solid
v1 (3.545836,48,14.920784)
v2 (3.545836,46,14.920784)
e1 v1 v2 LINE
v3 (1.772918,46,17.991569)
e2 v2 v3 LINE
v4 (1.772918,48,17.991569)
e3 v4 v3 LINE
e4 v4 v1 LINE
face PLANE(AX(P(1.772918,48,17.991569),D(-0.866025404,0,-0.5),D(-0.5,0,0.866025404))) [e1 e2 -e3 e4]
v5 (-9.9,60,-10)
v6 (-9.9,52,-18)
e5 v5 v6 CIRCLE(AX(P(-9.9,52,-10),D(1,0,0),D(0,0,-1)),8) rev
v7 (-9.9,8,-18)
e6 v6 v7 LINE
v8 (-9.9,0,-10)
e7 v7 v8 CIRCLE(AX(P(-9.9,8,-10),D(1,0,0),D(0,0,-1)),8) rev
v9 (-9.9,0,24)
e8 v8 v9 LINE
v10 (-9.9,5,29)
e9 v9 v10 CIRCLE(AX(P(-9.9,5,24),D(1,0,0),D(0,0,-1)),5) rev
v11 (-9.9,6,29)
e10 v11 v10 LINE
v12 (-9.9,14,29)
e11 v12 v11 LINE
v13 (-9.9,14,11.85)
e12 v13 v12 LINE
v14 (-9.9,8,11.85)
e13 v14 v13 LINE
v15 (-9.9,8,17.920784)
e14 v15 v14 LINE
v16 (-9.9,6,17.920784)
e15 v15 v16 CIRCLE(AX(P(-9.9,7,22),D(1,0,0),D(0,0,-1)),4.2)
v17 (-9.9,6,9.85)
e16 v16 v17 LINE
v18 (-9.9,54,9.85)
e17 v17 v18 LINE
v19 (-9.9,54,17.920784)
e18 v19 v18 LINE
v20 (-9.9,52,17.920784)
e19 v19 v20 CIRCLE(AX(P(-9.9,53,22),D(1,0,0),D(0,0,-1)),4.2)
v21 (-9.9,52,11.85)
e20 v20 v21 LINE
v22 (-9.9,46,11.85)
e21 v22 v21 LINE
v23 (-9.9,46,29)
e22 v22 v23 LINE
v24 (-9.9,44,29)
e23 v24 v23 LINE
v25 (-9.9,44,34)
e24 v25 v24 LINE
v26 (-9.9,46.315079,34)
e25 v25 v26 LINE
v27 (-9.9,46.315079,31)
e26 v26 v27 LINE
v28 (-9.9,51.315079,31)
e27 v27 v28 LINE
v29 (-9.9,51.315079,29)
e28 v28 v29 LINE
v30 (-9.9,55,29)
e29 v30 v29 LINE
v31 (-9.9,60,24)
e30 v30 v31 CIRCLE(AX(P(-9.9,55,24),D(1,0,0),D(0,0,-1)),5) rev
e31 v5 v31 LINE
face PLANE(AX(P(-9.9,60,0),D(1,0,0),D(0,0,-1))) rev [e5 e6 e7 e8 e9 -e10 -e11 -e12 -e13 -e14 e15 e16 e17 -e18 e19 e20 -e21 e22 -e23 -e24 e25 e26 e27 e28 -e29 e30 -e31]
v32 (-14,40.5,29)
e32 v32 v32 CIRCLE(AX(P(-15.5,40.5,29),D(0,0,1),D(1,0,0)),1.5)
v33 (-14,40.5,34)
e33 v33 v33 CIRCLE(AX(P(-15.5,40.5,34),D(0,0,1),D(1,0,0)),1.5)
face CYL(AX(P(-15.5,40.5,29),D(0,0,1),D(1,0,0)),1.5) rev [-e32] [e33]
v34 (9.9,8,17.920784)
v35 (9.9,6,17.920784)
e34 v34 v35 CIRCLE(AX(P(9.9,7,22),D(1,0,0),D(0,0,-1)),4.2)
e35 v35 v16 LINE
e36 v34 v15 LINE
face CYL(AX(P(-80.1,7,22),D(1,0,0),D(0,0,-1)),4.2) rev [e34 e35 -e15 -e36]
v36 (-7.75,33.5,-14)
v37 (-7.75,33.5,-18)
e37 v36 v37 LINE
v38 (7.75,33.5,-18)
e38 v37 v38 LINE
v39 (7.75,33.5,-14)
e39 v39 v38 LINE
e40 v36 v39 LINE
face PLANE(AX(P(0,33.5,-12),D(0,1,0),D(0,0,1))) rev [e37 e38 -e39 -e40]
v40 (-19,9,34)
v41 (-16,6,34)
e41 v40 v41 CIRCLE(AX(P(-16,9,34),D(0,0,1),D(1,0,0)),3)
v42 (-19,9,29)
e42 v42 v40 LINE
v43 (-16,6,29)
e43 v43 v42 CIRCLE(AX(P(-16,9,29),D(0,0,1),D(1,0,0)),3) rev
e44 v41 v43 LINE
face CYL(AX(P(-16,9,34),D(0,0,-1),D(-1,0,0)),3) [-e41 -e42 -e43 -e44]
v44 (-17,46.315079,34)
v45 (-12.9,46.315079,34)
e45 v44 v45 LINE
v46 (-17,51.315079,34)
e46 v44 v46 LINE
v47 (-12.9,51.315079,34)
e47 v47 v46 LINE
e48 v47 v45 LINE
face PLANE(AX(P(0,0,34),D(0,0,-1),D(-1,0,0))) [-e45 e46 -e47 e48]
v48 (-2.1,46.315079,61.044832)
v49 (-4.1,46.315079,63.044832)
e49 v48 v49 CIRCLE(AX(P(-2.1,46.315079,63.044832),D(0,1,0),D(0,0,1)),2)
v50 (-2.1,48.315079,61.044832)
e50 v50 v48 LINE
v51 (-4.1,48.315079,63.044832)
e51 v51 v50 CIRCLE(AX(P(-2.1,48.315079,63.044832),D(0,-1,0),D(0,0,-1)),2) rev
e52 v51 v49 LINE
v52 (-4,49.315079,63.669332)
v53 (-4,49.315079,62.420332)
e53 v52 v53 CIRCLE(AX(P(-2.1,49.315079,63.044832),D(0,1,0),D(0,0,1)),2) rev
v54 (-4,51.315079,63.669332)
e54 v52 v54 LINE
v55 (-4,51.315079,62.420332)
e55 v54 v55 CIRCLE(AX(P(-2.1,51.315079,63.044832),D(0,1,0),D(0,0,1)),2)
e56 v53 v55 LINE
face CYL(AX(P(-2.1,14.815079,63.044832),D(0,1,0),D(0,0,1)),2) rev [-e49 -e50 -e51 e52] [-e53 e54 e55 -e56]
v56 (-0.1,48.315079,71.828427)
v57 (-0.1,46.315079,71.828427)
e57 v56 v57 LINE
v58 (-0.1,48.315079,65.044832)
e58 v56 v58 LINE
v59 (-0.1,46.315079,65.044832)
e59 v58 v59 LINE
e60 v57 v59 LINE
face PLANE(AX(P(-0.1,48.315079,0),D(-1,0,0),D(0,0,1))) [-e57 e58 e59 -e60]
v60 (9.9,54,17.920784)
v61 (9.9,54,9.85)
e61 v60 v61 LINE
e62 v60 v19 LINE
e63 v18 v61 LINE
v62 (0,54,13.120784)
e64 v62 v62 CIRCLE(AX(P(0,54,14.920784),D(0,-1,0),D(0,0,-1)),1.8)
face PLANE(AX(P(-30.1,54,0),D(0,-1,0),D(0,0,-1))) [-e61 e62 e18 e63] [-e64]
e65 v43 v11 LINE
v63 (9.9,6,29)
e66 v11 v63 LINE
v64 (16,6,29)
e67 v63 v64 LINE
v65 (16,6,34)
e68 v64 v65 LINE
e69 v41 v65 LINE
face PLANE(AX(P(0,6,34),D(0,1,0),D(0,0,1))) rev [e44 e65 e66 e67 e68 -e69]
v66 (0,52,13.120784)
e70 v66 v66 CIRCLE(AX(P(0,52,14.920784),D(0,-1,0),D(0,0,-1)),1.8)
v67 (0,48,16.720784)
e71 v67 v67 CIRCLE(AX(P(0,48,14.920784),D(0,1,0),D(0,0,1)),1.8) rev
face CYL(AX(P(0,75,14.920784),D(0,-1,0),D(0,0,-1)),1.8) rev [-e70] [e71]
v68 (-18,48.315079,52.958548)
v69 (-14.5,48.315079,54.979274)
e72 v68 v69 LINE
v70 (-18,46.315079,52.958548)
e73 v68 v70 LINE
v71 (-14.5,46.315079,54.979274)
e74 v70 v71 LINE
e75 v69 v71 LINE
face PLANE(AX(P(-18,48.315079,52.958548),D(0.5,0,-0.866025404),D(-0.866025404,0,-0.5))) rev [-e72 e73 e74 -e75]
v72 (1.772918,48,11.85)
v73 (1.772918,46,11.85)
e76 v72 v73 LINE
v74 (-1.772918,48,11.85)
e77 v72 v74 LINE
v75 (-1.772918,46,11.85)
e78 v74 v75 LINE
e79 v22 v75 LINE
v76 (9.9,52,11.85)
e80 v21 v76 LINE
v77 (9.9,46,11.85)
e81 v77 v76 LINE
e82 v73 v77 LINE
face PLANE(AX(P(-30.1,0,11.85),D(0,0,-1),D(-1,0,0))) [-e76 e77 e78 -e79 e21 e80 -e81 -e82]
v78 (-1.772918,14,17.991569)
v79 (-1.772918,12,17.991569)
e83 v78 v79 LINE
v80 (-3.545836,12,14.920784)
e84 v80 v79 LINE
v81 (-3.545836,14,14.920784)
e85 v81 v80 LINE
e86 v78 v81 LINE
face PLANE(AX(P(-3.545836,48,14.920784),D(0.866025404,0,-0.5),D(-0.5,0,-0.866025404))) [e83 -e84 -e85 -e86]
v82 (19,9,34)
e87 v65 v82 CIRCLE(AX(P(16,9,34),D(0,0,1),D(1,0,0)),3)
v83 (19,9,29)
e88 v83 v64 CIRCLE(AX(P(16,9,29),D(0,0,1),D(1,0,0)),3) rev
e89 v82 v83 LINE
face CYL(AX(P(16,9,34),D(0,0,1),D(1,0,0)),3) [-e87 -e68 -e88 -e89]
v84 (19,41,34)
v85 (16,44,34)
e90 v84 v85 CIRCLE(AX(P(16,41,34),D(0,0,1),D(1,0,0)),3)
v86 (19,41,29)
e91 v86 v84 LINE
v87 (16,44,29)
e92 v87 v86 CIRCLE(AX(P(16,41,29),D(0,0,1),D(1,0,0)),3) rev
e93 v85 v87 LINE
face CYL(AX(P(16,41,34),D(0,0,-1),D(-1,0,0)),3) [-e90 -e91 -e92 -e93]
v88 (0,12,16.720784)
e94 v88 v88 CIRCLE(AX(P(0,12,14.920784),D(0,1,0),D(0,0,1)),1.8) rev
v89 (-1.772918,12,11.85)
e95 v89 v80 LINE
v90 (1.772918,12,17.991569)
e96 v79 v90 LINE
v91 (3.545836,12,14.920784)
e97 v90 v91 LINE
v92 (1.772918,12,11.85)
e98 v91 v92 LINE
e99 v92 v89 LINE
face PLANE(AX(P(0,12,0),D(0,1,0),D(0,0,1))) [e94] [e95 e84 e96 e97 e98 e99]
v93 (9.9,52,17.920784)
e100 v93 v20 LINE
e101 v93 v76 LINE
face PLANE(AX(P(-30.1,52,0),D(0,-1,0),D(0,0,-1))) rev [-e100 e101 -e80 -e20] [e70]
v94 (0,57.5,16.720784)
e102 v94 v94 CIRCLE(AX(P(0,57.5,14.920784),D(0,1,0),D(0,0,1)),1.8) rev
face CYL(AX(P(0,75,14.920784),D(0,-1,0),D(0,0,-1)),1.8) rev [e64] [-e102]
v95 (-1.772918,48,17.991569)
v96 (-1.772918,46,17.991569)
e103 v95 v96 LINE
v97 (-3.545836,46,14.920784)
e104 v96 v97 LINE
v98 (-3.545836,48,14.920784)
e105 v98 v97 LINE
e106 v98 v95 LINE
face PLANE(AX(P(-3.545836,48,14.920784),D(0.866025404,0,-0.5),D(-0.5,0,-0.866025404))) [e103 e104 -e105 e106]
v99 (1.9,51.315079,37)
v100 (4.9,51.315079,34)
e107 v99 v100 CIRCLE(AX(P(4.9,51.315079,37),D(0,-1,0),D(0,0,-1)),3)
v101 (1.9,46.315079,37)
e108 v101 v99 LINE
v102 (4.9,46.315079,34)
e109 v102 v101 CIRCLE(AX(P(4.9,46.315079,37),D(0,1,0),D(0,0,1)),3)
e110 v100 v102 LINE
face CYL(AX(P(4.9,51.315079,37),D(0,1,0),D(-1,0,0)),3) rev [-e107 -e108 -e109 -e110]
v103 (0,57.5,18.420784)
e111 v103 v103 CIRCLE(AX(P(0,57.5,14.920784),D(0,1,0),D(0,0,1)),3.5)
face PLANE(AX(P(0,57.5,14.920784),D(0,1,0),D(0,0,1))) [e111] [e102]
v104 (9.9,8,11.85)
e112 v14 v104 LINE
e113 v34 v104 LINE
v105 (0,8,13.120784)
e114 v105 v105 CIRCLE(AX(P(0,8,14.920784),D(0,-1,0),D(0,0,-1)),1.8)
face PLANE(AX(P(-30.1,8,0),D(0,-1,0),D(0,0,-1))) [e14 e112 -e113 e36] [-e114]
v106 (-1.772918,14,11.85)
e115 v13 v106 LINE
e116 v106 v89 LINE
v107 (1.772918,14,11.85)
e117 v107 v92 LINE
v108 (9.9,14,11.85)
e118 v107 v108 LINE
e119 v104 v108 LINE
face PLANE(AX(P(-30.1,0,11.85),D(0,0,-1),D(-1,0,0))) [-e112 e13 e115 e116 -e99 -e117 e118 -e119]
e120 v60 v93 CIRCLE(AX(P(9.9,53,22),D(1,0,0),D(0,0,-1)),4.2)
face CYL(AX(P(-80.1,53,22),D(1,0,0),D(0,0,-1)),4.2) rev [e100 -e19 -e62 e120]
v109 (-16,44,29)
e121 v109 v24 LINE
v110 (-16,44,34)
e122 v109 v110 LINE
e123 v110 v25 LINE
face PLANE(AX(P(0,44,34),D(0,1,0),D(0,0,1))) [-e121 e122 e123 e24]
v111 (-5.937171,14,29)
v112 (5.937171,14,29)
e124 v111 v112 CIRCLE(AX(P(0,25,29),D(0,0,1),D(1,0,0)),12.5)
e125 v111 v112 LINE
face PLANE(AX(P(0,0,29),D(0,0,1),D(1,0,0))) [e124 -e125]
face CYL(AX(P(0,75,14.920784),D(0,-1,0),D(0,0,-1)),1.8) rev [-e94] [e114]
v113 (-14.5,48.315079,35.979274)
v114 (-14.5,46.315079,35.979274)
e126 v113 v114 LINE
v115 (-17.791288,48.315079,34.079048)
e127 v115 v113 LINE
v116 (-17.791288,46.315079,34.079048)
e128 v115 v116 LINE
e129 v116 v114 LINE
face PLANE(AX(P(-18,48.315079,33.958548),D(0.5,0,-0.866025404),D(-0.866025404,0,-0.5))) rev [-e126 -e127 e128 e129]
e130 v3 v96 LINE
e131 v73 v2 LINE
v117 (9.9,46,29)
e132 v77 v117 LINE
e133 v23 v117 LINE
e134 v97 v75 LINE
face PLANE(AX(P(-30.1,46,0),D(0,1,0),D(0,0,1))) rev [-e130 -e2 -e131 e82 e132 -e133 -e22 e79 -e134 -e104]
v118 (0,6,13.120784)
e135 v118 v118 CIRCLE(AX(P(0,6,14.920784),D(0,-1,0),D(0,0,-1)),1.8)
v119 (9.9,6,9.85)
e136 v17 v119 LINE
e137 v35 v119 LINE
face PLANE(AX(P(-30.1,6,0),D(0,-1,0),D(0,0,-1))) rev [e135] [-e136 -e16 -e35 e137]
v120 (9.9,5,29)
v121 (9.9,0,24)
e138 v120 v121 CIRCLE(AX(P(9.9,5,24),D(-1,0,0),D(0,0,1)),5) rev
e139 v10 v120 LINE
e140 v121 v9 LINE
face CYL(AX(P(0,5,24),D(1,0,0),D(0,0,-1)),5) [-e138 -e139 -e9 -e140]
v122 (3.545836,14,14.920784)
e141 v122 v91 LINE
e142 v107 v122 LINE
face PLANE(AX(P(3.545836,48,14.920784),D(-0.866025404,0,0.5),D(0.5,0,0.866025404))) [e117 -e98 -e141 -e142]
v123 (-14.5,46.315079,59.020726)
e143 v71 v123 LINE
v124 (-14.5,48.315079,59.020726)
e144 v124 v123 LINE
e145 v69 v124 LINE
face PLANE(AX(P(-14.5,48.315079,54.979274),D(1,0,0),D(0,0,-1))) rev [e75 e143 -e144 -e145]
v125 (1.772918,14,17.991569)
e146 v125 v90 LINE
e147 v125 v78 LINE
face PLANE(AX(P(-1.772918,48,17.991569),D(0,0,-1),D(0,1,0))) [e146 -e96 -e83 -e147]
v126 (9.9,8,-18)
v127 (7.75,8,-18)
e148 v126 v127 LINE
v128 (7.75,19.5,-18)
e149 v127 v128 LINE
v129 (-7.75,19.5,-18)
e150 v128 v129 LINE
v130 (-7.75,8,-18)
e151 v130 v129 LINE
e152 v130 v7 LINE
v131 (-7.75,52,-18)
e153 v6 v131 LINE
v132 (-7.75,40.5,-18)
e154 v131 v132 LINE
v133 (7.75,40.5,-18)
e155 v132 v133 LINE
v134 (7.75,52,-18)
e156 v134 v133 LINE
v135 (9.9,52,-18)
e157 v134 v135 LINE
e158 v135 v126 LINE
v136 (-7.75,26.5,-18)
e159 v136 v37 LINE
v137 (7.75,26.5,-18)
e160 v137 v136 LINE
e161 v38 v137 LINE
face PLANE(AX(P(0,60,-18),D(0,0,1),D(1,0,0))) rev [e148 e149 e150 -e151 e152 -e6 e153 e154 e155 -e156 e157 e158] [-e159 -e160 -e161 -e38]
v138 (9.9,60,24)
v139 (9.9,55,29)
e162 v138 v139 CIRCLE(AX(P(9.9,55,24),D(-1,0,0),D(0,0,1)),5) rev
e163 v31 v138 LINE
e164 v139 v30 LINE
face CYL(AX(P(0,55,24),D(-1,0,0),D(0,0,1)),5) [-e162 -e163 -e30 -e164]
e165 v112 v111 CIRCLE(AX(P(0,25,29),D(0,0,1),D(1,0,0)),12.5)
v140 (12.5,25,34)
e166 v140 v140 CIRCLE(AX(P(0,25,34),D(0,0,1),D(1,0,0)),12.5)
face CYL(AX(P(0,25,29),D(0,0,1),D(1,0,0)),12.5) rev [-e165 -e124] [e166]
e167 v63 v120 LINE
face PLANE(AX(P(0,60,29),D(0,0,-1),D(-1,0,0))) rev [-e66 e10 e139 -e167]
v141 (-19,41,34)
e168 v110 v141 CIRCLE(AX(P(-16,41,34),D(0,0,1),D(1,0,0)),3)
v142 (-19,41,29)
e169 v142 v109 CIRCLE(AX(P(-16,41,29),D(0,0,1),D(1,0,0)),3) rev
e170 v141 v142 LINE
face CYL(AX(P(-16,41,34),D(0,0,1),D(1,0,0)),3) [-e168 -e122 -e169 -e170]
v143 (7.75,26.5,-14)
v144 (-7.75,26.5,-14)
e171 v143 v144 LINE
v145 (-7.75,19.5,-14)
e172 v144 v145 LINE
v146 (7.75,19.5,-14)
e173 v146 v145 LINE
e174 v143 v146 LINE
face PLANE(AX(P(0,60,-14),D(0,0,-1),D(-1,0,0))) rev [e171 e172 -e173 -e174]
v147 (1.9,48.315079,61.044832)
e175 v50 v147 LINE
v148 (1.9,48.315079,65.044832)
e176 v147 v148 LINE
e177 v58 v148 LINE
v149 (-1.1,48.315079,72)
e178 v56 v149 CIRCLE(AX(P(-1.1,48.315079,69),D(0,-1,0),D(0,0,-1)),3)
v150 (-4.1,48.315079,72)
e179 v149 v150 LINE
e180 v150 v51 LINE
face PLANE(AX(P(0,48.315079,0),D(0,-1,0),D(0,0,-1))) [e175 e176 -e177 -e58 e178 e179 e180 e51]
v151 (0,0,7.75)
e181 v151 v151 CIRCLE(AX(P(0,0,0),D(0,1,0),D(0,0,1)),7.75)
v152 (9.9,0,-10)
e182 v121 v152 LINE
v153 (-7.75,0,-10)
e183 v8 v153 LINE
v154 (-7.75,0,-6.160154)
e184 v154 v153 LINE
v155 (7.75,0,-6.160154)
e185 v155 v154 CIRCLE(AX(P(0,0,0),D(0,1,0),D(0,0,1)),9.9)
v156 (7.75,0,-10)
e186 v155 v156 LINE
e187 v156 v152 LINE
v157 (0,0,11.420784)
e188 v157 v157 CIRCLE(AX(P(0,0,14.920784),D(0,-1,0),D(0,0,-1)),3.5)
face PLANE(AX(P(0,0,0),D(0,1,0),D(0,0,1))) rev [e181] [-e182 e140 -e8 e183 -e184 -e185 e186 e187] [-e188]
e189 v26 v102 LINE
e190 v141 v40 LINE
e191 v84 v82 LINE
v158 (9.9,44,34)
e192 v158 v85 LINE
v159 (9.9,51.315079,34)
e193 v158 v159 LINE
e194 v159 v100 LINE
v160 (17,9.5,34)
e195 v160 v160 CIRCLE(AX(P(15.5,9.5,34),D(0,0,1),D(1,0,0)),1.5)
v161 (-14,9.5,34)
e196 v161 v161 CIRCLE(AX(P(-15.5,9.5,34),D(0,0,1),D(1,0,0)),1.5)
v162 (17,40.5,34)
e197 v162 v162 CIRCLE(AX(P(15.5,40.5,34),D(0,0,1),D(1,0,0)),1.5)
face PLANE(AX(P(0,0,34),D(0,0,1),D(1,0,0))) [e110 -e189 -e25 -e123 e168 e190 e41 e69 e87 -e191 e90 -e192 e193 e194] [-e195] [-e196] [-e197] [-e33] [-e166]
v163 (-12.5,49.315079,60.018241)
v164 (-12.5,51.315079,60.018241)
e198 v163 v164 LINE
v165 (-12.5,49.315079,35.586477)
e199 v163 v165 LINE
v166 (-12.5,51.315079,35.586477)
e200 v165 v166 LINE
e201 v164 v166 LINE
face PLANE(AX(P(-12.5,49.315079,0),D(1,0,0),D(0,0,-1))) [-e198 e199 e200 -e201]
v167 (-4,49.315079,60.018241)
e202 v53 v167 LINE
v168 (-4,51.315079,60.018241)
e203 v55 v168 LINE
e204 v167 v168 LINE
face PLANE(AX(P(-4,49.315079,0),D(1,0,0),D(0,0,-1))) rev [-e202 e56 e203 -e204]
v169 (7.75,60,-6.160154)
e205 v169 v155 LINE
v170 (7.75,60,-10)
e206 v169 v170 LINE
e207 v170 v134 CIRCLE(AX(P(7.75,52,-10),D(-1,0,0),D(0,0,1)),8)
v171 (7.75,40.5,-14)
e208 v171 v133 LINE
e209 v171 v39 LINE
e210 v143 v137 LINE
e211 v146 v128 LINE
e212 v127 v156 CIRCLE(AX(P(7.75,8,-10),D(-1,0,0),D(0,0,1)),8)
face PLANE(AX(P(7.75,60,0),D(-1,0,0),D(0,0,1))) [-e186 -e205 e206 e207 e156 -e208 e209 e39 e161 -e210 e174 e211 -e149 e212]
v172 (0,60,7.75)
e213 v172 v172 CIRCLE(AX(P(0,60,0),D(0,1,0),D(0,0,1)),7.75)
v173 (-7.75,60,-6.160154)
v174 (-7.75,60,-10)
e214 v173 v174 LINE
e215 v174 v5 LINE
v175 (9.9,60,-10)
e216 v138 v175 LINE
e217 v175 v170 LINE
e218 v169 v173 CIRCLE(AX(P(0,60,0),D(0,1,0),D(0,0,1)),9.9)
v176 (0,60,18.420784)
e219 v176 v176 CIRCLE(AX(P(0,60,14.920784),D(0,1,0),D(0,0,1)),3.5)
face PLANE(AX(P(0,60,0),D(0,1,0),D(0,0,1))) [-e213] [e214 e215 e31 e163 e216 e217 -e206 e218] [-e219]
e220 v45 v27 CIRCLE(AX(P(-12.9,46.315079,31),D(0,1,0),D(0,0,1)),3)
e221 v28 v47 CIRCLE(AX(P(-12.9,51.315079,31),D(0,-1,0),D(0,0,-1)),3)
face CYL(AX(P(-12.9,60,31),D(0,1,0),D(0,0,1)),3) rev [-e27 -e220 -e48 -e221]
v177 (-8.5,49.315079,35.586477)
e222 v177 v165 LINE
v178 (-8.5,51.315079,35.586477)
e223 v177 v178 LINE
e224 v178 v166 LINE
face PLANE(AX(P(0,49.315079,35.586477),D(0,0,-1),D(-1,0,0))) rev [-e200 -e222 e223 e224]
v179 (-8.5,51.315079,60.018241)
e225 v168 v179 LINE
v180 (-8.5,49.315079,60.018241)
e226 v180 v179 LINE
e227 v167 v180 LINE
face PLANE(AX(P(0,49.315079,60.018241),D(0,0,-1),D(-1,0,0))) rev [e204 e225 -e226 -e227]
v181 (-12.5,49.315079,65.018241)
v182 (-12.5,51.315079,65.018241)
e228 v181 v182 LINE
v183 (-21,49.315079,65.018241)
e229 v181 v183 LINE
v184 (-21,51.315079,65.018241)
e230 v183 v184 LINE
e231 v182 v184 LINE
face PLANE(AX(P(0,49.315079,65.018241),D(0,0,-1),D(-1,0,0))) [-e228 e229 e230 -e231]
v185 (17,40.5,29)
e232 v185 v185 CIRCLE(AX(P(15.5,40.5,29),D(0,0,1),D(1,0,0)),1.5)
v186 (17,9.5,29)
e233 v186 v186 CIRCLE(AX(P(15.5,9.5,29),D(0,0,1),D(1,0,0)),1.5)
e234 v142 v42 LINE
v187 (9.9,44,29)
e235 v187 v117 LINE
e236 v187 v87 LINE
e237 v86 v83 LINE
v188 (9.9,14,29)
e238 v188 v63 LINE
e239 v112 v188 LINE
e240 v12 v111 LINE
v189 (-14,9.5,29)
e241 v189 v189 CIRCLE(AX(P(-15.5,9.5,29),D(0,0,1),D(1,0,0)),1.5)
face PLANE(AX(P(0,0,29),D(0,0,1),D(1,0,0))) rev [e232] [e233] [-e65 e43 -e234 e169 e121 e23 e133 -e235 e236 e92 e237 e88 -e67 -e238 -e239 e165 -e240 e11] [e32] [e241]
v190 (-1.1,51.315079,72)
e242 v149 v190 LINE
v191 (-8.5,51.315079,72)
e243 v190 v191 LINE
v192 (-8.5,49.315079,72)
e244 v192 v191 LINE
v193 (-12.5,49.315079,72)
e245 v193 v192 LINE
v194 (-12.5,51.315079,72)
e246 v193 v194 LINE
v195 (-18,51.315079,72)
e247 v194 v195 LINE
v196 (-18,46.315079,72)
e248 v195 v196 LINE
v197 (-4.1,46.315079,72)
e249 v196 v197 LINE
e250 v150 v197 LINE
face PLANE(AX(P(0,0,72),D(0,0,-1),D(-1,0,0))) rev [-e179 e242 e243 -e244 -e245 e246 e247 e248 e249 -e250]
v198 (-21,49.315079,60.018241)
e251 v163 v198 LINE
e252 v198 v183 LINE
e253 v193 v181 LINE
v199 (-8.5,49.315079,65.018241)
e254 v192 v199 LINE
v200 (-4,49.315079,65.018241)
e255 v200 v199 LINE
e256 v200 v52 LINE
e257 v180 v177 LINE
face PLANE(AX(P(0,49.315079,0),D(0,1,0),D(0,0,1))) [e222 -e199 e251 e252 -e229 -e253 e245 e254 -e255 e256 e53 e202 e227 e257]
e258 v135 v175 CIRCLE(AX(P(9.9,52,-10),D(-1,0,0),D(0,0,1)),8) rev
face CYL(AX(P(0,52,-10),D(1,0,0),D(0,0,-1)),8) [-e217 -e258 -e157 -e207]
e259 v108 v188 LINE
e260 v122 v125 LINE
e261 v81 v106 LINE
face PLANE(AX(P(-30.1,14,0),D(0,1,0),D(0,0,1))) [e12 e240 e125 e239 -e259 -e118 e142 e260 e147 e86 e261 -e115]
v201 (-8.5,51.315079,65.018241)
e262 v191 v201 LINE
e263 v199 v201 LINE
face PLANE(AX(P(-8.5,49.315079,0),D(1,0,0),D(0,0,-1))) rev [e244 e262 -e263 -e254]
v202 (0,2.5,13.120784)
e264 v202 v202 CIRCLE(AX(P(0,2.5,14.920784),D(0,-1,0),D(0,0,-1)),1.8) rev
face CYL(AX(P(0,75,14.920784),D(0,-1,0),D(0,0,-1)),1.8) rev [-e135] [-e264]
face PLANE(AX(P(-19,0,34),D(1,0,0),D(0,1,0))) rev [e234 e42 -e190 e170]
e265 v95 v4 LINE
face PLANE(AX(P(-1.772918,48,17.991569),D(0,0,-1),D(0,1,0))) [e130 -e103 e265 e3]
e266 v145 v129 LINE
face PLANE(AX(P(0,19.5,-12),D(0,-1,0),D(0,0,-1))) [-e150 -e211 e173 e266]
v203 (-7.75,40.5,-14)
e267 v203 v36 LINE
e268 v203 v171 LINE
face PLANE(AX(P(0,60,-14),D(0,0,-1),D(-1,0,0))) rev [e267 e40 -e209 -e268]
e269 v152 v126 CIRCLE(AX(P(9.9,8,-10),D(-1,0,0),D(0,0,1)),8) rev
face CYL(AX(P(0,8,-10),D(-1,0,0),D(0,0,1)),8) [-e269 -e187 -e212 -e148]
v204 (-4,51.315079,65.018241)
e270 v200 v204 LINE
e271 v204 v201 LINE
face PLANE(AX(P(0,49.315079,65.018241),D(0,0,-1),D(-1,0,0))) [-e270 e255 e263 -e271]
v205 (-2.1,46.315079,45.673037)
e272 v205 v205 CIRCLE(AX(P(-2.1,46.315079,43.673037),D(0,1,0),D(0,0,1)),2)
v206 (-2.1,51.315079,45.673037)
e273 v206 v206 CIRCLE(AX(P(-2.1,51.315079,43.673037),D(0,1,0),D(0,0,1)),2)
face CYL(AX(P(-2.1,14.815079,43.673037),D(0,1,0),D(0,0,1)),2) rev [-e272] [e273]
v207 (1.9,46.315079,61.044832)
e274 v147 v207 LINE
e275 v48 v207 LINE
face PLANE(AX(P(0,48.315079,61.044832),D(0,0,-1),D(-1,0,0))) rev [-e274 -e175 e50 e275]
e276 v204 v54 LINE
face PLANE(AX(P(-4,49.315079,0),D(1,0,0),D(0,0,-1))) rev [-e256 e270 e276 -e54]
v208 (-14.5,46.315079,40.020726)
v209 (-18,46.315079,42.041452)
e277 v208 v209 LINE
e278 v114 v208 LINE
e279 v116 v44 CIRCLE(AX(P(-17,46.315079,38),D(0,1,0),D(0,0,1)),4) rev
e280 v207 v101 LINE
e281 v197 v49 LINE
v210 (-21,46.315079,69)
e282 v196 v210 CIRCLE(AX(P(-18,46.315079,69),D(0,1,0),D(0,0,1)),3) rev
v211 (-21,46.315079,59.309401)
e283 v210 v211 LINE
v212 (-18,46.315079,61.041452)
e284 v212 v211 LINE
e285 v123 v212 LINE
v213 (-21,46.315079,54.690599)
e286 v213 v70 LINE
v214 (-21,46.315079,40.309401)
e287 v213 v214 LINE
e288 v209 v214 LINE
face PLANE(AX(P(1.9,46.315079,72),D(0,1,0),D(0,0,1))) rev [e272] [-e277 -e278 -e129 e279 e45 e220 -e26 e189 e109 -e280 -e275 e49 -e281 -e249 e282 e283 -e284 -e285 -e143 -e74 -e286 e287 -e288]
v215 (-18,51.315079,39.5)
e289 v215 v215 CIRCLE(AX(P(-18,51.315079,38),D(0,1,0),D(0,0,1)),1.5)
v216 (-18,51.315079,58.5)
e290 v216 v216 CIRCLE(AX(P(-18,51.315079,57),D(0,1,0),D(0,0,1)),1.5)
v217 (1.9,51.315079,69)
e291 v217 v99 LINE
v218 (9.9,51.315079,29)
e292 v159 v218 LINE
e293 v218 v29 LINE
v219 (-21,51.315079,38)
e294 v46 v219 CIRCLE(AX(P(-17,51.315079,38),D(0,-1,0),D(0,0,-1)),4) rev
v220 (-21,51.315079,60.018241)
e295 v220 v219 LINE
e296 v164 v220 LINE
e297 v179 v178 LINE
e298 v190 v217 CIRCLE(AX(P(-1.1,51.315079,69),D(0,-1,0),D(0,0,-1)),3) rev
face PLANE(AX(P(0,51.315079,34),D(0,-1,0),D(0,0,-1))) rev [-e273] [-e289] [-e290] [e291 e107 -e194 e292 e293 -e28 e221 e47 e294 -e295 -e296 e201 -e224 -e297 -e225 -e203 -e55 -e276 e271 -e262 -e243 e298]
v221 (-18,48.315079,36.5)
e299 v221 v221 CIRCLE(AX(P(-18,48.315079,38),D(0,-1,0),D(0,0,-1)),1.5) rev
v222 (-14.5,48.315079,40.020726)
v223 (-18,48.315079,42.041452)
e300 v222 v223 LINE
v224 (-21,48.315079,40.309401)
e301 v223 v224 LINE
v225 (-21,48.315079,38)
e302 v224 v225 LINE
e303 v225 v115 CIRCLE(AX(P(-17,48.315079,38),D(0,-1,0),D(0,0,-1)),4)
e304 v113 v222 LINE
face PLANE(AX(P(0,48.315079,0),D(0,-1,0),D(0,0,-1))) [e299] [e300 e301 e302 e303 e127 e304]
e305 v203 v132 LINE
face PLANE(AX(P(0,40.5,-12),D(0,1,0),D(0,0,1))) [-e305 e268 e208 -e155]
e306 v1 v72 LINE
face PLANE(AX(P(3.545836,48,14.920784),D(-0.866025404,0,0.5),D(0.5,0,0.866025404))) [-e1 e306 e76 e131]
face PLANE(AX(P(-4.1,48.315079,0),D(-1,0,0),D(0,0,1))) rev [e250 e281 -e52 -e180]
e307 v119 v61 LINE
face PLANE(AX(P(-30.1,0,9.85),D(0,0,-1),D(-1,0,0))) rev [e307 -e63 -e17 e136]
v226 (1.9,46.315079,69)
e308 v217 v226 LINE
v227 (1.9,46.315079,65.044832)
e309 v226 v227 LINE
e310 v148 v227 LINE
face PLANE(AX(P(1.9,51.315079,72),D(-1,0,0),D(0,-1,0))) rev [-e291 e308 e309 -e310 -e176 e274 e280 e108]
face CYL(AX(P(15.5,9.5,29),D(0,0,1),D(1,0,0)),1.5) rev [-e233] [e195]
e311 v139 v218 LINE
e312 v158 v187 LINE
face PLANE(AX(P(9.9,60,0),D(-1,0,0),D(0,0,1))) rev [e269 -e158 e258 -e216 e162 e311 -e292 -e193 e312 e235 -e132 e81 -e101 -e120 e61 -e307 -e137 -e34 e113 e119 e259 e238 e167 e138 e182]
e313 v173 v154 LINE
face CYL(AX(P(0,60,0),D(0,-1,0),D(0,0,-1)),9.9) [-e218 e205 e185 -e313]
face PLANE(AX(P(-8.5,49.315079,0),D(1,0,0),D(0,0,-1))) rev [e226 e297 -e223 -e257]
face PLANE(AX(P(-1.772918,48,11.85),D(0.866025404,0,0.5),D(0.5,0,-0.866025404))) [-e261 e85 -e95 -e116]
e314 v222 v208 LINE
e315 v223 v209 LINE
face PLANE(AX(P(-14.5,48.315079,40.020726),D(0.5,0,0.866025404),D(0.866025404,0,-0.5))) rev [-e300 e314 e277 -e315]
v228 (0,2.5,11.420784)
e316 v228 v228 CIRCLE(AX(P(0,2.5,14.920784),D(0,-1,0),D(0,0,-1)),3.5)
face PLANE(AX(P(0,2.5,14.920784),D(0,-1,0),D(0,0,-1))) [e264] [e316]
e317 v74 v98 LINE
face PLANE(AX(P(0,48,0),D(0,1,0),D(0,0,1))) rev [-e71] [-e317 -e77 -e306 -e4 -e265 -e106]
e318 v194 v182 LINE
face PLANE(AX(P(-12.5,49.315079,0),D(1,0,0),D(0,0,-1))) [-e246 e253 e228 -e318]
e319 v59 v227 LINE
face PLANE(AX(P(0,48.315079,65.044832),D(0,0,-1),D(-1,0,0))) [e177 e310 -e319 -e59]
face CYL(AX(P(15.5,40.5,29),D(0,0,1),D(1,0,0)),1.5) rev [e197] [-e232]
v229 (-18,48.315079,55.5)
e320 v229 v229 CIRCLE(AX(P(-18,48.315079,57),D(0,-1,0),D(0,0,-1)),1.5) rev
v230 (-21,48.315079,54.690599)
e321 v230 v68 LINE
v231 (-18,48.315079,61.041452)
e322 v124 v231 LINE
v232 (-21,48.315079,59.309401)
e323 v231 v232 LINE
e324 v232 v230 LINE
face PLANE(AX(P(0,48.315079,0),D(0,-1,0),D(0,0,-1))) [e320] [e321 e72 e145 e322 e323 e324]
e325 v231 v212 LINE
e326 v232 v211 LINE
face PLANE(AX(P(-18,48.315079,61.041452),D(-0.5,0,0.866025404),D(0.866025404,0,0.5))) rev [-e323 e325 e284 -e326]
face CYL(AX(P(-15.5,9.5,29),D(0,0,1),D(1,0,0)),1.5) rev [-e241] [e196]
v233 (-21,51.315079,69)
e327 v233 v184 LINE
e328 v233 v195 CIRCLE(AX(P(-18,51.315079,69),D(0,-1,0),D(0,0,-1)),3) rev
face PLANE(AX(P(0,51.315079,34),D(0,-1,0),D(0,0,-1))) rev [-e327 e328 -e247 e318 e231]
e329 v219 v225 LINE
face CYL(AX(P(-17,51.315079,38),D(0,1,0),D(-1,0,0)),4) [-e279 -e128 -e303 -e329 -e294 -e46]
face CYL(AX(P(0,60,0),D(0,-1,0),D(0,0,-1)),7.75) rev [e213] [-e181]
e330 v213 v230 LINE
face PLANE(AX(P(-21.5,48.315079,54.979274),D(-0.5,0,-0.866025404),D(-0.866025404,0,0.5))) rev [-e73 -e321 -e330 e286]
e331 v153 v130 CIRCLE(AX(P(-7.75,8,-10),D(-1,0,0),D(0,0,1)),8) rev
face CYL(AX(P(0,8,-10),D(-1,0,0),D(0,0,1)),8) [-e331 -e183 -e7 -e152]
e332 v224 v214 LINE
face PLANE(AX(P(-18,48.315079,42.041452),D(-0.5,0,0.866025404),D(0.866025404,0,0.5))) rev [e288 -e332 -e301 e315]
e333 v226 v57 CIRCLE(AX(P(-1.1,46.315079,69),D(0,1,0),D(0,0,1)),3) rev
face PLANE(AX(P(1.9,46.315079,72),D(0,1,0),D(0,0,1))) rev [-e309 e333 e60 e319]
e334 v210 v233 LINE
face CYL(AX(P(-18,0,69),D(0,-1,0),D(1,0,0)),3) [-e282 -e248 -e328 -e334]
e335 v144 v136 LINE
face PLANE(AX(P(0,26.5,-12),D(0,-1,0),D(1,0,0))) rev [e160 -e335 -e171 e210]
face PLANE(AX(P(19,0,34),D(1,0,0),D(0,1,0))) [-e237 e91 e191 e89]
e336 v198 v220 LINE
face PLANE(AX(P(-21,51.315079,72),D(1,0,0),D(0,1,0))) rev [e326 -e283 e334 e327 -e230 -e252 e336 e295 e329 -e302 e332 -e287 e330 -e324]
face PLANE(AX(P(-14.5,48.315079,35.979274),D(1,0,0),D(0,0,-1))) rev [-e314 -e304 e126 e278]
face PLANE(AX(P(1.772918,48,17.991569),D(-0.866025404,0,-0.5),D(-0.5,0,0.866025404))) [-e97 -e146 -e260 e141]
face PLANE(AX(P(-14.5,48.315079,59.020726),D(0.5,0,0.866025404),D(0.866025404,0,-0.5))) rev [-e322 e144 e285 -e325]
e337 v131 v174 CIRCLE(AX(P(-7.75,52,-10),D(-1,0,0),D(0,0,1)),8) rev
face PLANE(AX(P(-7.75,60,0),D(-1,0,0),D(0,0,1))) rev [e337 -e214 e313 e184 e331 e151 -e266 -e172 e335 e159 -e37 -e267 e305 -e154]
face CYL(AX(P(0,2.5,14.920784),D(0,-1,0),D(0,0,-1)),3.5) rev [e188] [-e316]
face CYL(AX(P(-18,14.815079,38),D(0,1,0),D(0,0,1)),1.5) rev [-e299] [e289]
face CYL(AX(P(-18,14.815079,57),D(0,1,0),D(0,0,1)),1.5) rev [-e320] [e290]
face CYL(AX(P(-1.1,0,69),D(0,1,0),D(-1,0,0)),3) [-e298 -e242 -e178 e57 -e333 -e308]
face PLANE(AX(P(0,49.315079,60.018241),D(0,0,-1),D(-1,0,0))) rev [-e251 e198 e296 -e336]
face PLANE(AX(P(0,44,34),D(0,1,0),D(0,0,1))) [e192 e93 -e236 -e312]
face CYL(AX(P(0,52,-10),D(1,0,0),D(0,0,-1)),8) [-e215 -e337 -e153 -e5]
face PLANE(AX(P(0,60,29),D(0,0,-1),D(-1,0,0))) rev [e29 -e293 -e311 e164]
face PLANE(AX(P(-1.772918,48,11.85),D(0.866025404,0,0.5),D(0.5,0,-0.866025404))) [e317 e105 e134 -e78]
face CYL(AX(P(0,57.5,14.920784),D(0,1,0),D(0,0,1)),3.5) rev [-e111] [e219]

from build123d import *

# Parameters (mm, degrees)
SKETCH_1_W                = 15.5
SKETCH_1_H                = 11.302783866
EXTRUDE_1_DEPTH           = 60
SKETCH_2_R                = 4.2
CUT_EXTRUDE_1_DEPTH       = 90
CUT_EXTRUDE_2_DEPTH       = 40
SKETCH_4_W                = 15.5
SKETCH_4_H                = 19.5
SKETCH_4_H_2              = 7
CUT_EXTRUDE_3_DEPTH       = 6
FILLET_1_R                = 5
FILLET_2_R                = 8
SKETCH_13_R               = 1.8
CUT_EXTRUDE_9_DEPTH       = 75
SKETCH_8_W                = 19.8
SKETCH_8_H                = 7.315078523
SKETCH_8_H_2              = 8
EXTRUDE_3_DEPTH           = 5
SKETCH_10_R               = 12.5
SKETCH_10_R_2             = 1.5
CUT_EXTRUDE_6_DEPTH       = 5
FILLET_4_R                = 3
CUT_EXTRUDE_10_DEPTH      = 34
CUT_EXTRUDE_10_DEPTH_BACK = 2
SKETCH_15_R               = 3.5
CUT_EXTRUDE_11_DEPTH      = 2.5
CUT_EXTRUDE_START         = -2.5
SKETCH_16_R               = 3.5
CUT_EXTRUDE_12_DEPTH      = 2.5
SKETCH_17_W               = 22.9
SKETCH_17_H               = 5
EXTRUDE_4_DEPTH           = 38
SKETCH_18_R               = 1.5
SKETCH_18_R_2             = 2
CUT_EXTRUDE_13_DEPTH      = 36.5
CUT_EXTRUDE_14_DEPTH      = 2
FILLET_5_R                = 3
SKETCH_20_W               = 4.5
SKETCH_20_H               = 5
SKETCH_20_W_2             = 4
SKETCH_20_W_3             = 8.5
SKETCH_20_H_2             = 6.981759249
SKETCH_20_H_3             = 24.431763341
CUT_EXTRUDE_15_DEPTH      = 2
FILLET_6_R                = 4
SKETCH_22_W               = 4
SKETCH_22_H               = 4
SKETCH_22_H_2             = 8.955168194
CUT_EXTRUDE_16_DEPTH      = 2


with BuildPart() as part:
    # Эскиз1 → Бобышка-Вытянуть1 (new body)
    with BuildSketch(Plane(origin=(0, 0, 0), x_dir=(1, 0, 0), z_dir=(0, 1, 0))):
        with BuildLine():
            Line((7.75, 0), (7.75, 6.160154219))
            ThreePointArc((7.75, 6.160154219), (0, 9.9), (-7.75, 6.160154219))
            Line((-7.75, 6.160154219), (-7.75, -3.2e-08))
            ThreePointArc((-7.75, -3.2e-08), (-1.6e-08, 7.75), (7.75, 0))
        make_face()
        with BuildLine():
            ThreePointArc((0, -9.9), (4.302584876, -8.916151826), (7.75, -6.160154219))
            Line((7.75, -6.160154219), (7.75, 0))
            ThreePointArc((7.75, 0), (1.6e-08, -7.75), (-7.75, -3.2e-08))
            Line((-7.75, -3.2e-08), (-7.75, -6.160154219))
            ThreePointArc((-7.75, -6.160154219), (-4.302584876, -8.916151826), (0, -9.9))
        make_face()
        with BuildLine():
            ThreePointArc((7.75, 6.160154219), (9.347058361, 3.262284476), (9.9, 0))
            Line((9.9, 0), (9.9, 18))
            Line((9.9, 18), (-9.9, 18))
            Line((-9.9, 18), (-9.9, 0))
            ThreePointArc((-9.9, 0), (-9.347058361, 3.262284476), (-7.75, 6.160154219))
            Line((-7.75, 6.160154219), (-7.75, 14))
            Line((-7.75, 14), (7.75, 14))
            Line((7.75, 14), (7.75, 6.160154219))
        make_face()
        with BuildLine():
            ThreePointArc((7.75, -6.160154219), (9.347058361, -3.262284476), (9.9, 0))
            ThreePointArc((9.9, 0), (9.347058361, 3.262284476), (7.75, 6.160154219))
            Line((7.75, 6.160154219), (7.75, 0))
            Line((7.75, 0), (7.75, -6.160154219))
        make_face()
        with BuildLine():
            Line((-7.75, -3.2e-08), (-7.75, 6.160154219))
            ThreePointArc((-7.75, 6.160154219), (-9.347058361, 3.262284476), (-9.9, 0))
            ThreePointArc((-9.9, 0), (-9.347058361, -3.262284476), (-7.75, -6.160154219))
            Line((-7.75, -6.160154219), (-7.75, -3.2e-08))
        make_face()
        with BuildLine():
            Line((9.9, -29), (9.9, 0))
            ThreePointArc((9.9, 0), (9.347058361, -3.262284476), (7.75, -6.160154219))
            Line((7.75, -6.160154219), (7.75, -9.9))
            Line((7.75, -9.9), (7.75, -11.85))
            Line((7.75, -11.85), (7.75, -23.152783866))
            Line((7.75, -23.152783866), (-7.75, -23.152783866))
            Line((-7.75, -23.152783866), (-7.75, -11.85))
            Line((-7.75, -11.85), (-7.75, -9.9))
            Line((-7.75, -9.9), (-7.75, -6.160154219))
            ThreePointArc((-7.75, -6.160154219), (-9.347058361, -3.262284476), (-9.9, 0))
            Line((-9.9, 0), (-9.9, -29))
            Line((-9.9, -29), (9.9, -29))
        make_face()
        with Locations((0, -17.501391933)):
            Rectangle(SKETCH_1_W, SKETCH_1_H)
        Polygon((7.75, -11.85), (7.75, -9.9), (0, -9.9), (-7.75, -9.9), (-7.75, -11.85), align=None)
        with BuildLine():
            Line((7.75, -9.9), (7.75, -6.160154219))
            ThreePointArc((7.75, -6.160154219), (4.302584876, -8.916151826), (0, -9.9))
            Line((0, -9.9), (7.75, -9.9))
        make_face()
        with BuildLine():
            Line((-7.75, -9.9), (0, -9.9))
            ThreePointArc((0, -9.9), (-4.302584876, -8.916151826), (-7.75, -6.160154219))
            Line((-7.75, -6.160154219), (-7.75, -9.9))
        make_face()
    extrude(amount=EXTRUDE_1_DEPTH)

    # Эскиз2 → Вырез-Вытянуть1 (cut)
    with BuildSketch(Plane(origin=(9.9, 0, 0), x_dir=(0, 0, -1), z_dir=(1, 0, 0))):
        with Locations((-22, 53)):
            Circle(SKETCH_2_R)
        with Locations((-22, 7)):
            Circle(SKETCH_2_R)
    extrude(amount=-CUT_EXTRUDE_1_DEPTH, mode=Mode.SUBTRACT)

    # Эскиз3 → Вырез-Вытянуть2 (cut)
    with BuildSketch(Plane(origin=(9.9, 0, 0), x_dir=(0, 0, -1), z_dir=(1, 0, 0))):
        Polygon((-29, 46), (-29, 14), (-11.85, 14), (-11.85, 8), (-22, 8), (-22, 6), (-9.85, 6), (-9.85, 54), (-22, 54), (-22, 52), (-11.85, 52), (-11.85, 46), align=None)
    extrude(amount=-CUT_EXTRUDE_2_DEPTH, mode=Mode.SUBTRACT)

    # Эскиз4 → Вырез-Вытянуть3 (cut)
    with BuildSketch(Plane(origin=(0, 0, -18), x_dir=(-1, 0, 0), z_dir=(0, 0, -1))):
        with Locations((0, 50.25)):
            Rectangle(SKETCH_4_W, SKETCH_4_H)
        with Locations((0, 30)):
            Rectangle(SKETCH_4_W, SKETCH_4_H_2)
        with Locations((0, 9.75)):
            Rectangle(SKETCH_4_W, SKETCH_4_H)
    extrude(amount=-CUT_EXTRUDE_3_DEPTH, mode=Mode.SUBTRACT)

    # Скругление1
    fillet_1_edges = [part.edges().sort_by_distance(p)[0] for p in [
        (0, 60, 29),
        (0, 0, 29),
    ]]
    fillet(fillet_1_edges, radius=FILLET_1_R)

    # Скругление2
    fillet_2_edges = [part.edges().sort_by_distance(p)[0] for p in [
        (-8.825, 60, -18),
        (-8.825, 0, -18),
        (8.825, 0, -18),
        (8.825, 60, -18),
    ]]
    fillet(fillet_2_edges, radius=FILLET_2_R)

    # Эскиз13 → Вырез-Вытянуть9 (cut)
    with BuildSketch(Plane.XZ):
        with Locations(Location((0, 14.920784389, 0), (0, 0, 270))):
            Circle(SKETCH_13_R)
    extrude(amount=-CUT_EXTRUDE_9_DEPTH, mode=Mode.SUBTRACT)

    # Эскиз8 → Бобышка-Вытянуть3 (add)
    with BuildSketch(Plane.XY.offset(29)):
        Polygon((-9.9, 44), (-19, 44), (-19, 6), (-9.9, 6), (-9.9, 14), (9.9, 14), (9.9, 6), (19, 6), (19, 44), (9.9, 44), align=None)
        with Locations((0, 47.657539262)):
            Rectangle(SKETCH_8_W, SKETCH_8_H)
        with Locations((0, 10)):
            Rectangle(SKETCH_8_W, SKETCH_8_H_2)
    extrude(amount=EXTRUDE_3_DEPTH)

    # Эскиз10 → Вырез-Вытянуть6 (cut)
    with BuildSketch(Plane.XY.offset(34)):
        with Locations((0, 25)):
            Circle(SKETCH_10_R)
        with Locations((-15.5, 9.5)):
            Circle(SKETCH_10_R_2)
        with Locations((-15.5, 40.5)):
            Circle(SKETCH_10_R_2)
        with Locations((15.5, 9.5)):
            Circle(SKETCH_10_R_2)
        with Locations((15.5, 40.5)):
            Circle(SKETCH_10_R_2)
    extrude(amount=-CUT_EXTRUDE_6_DEPTH, mode=Mode.SUBTRACT)

    # Скругление4
    fillet_4_edges = [part.edges().sort_by_distance(p)[0] for p in [
        (-19, 6, 31.5),
        (19, 6, 31.5),
        (19, 44, 31.5),
        (-19, 44, 31.5),
    ]]
    fillet(fillet_4_edges, radius=FILLET_4_R)

    # Эскиз14 → Вырез-Вытянуть10 (cut, two sides: drawn at the far end of the back side and taken through both)
    with BuildSketch(Plane(origin=(0, 14, 0), x_dir=(1, 0, 0), z_dir=(0, 1, 0)).offset(-CUT_EXTRUDE_10_DEPTH_BACK)):
        Polygon((-1.772918194, -17.991568778), (1.772918194, -17.991568778), (3.545836387, -14.920784389), (1.772918194, -11.85), (-1.772918194, -11.85), (-3.545836387, -14.920784389), align=None)
    extrude(amount=CUT_EXTRUDE_10_DEPTH + CUT_EXTRUDE_10_DEPTH_BACK, mode=Mode.SUBTRACT)

    # Эскиз15 → Вырез-Вытянуть11 (cut)
    with BuildSketch(Plane(origin=(0, 60, 0), x_dir=(1, 0, 0), z_dir=(0, 1, 0))):
        with Locations(Location((0, -14.920784389, 0), (0, 0, 270))):
            Circle(SKETCH_15_R)
    extrude(amount=-CUT_EXTRUDE_11_DEPTH, mode=Mode.SUBTRACT)

    # Эскиз16 → Вырез-Вытянуть12 (cut)
    with BuildSketch(Plane.XZ.offset(CUT_EXTRUDE_START)):
        with Locations(Location((0, 14.920784389, 0), (0, 0, 90))):
            Circle(SKETCH_16_R)
    extrude(amount=CUT_EXTRUDE_12_DEPTH, mode=Mode.SUBTRACT)

    # Эскиз17 → Бобышка-Вытянуть4 (add)
    with BuildSketch(Plane.XY.offset(34)):
        with Locations((-9.55, 48.815078523)):
            Rectangle(SKETCH_17_W, SKETCH_17_H)
    extrude(amount=EXTRUDE_4_DEPTH)

    # Эскиз18 → Вырез-Вытянуть13 (cut)
    with BuildSketch(Plane(origin=(0, 51.315078523, 0), x_dir=(1, 0, 0), z_dir=(0, 1, 0))):
        with Locations(Location((-18, -57, 0), (0, 0, 270))):
            Circle(SKETCH_18_R)
        with Locations(Location((-18, -38, 0), (0, 0, 270))):
            Circle(SKETCH_18_R)
        with Locations(Location((-2.1, -63.044831806, 0), (0, 0, 270))):
            Circle(SKETCH_18_R_2)
        with Locations(Location((-2.1, -43.673036669, 0), (0, 0, 270))):
            Circle(SKETCH_18_R_2)
    extrude(amount=-CUT_EXTRUDE_13_DEPTH, mode=Mode.SUBTRACT)

    # Эскиз19 → Вырез-Вытянуть14 (cut)
    with BuildSketch(Plane.XZ.offset(-46.315078523)):
        Polygon((-18, 61.041451884), (-21.5, 59.020725942), (-21.5, 54.979274058), (-18, 52.958548116), (-14.5, 54.979274058), (-14.5, 59.020725942), align=None)
        Polygon((-18, 42.041451884), (-21.5, 40.020725942), (-21.5, 35.979274058), (-18, 33.958548116), (-14.5, 35.979274058), (-14.5, 40.020725942), align=None)
    extrude(amount=-CUT_EXTRUDE_14_DEPTH, mode=Mode.SUBTRACT)

    # Скругление5
    fillet_5_edges = [part.edges().sort_by_distance(p)[0] for p in [
        (-9.9, 48.815078523, 34),
        (1.9, 48.815078523, 34),
        (1.9, 48.815078523, 72),
        (-21, 48.815078523, 72),
    ]]
    fillet(fillet_5_edges, radius=FILLET_5_R)

    # Эскиз20 → Вырез-Вытянуть15 (cut)
    with BuildSketch(Plane(origin=(0, 51.315078523, 0), x_dir=(1, 0, 0), z_dir=(0, 1, 0))):
        with Locations((-6.25, -62.518240751)):
            Rectangle(SKETCH_20_W, SKETCH_20_H)
        with Locations((-10.5, -62.518240751)):
            Rectangle(SKETCH_20_W_2, SKETCH_20_H)
        with Locations((-16.75, -62.518240751)):
            Rectangle(SKETCH_20_W_3, SKETCH_20_H)
        with Locations((-10.5, -68.509120376)):
            Rectangle(SKETCH_20_W_2, SKETCH_20_H_2)
        with Locations((-10.5, -47.80235908)):
            Rectangle(SKETCH_20_W_2, SKETCH_20_H_3)
    extrude(amount=-CUT_EXTRUDE_15_DEPTH, mode=Mode.SUBTRACT)

    # Скругление6
    # the kernel refuses this fillet: 4 mm, written as the material it takes off along each edge
    with BuildSketch(Plane(origin=(-21, 61.315078523, 34), x_dir=(1, 0, 0), z_dir=(0, -1, 0))) as fillet_6_piece_1:
        with BuildLine():
            CenterArc((FILLET_6_R, FILLET_6_R), FILLET_6_R, 180, 90)
            Line((0, FILLET_6_R), (0, 0))
            Line((0, 0), (FILLET_6_R, 0))
        make_face()
    extrude(amount=25, mode=Mode.SUBTRACT)

    # Эскиз22 → Вырез-Вытянуть16 (cut)
    with BuildSketch(Plane.XZ.offset(-46.315078523)):
        with Locations((-0.1, 63.044831806)):
            Rectangle(SKETCH_22_W, SKETCH_22_H)
        with Locations((-2.1, 67.522415903)):
            Rectangle(SKETCH_22_W, SKETCH_22_H_2)
    extrude(amount=-CUT_EXTRUDE_16_DEPTH, mode=Mode.SUBTRACT)


solid = part.part
